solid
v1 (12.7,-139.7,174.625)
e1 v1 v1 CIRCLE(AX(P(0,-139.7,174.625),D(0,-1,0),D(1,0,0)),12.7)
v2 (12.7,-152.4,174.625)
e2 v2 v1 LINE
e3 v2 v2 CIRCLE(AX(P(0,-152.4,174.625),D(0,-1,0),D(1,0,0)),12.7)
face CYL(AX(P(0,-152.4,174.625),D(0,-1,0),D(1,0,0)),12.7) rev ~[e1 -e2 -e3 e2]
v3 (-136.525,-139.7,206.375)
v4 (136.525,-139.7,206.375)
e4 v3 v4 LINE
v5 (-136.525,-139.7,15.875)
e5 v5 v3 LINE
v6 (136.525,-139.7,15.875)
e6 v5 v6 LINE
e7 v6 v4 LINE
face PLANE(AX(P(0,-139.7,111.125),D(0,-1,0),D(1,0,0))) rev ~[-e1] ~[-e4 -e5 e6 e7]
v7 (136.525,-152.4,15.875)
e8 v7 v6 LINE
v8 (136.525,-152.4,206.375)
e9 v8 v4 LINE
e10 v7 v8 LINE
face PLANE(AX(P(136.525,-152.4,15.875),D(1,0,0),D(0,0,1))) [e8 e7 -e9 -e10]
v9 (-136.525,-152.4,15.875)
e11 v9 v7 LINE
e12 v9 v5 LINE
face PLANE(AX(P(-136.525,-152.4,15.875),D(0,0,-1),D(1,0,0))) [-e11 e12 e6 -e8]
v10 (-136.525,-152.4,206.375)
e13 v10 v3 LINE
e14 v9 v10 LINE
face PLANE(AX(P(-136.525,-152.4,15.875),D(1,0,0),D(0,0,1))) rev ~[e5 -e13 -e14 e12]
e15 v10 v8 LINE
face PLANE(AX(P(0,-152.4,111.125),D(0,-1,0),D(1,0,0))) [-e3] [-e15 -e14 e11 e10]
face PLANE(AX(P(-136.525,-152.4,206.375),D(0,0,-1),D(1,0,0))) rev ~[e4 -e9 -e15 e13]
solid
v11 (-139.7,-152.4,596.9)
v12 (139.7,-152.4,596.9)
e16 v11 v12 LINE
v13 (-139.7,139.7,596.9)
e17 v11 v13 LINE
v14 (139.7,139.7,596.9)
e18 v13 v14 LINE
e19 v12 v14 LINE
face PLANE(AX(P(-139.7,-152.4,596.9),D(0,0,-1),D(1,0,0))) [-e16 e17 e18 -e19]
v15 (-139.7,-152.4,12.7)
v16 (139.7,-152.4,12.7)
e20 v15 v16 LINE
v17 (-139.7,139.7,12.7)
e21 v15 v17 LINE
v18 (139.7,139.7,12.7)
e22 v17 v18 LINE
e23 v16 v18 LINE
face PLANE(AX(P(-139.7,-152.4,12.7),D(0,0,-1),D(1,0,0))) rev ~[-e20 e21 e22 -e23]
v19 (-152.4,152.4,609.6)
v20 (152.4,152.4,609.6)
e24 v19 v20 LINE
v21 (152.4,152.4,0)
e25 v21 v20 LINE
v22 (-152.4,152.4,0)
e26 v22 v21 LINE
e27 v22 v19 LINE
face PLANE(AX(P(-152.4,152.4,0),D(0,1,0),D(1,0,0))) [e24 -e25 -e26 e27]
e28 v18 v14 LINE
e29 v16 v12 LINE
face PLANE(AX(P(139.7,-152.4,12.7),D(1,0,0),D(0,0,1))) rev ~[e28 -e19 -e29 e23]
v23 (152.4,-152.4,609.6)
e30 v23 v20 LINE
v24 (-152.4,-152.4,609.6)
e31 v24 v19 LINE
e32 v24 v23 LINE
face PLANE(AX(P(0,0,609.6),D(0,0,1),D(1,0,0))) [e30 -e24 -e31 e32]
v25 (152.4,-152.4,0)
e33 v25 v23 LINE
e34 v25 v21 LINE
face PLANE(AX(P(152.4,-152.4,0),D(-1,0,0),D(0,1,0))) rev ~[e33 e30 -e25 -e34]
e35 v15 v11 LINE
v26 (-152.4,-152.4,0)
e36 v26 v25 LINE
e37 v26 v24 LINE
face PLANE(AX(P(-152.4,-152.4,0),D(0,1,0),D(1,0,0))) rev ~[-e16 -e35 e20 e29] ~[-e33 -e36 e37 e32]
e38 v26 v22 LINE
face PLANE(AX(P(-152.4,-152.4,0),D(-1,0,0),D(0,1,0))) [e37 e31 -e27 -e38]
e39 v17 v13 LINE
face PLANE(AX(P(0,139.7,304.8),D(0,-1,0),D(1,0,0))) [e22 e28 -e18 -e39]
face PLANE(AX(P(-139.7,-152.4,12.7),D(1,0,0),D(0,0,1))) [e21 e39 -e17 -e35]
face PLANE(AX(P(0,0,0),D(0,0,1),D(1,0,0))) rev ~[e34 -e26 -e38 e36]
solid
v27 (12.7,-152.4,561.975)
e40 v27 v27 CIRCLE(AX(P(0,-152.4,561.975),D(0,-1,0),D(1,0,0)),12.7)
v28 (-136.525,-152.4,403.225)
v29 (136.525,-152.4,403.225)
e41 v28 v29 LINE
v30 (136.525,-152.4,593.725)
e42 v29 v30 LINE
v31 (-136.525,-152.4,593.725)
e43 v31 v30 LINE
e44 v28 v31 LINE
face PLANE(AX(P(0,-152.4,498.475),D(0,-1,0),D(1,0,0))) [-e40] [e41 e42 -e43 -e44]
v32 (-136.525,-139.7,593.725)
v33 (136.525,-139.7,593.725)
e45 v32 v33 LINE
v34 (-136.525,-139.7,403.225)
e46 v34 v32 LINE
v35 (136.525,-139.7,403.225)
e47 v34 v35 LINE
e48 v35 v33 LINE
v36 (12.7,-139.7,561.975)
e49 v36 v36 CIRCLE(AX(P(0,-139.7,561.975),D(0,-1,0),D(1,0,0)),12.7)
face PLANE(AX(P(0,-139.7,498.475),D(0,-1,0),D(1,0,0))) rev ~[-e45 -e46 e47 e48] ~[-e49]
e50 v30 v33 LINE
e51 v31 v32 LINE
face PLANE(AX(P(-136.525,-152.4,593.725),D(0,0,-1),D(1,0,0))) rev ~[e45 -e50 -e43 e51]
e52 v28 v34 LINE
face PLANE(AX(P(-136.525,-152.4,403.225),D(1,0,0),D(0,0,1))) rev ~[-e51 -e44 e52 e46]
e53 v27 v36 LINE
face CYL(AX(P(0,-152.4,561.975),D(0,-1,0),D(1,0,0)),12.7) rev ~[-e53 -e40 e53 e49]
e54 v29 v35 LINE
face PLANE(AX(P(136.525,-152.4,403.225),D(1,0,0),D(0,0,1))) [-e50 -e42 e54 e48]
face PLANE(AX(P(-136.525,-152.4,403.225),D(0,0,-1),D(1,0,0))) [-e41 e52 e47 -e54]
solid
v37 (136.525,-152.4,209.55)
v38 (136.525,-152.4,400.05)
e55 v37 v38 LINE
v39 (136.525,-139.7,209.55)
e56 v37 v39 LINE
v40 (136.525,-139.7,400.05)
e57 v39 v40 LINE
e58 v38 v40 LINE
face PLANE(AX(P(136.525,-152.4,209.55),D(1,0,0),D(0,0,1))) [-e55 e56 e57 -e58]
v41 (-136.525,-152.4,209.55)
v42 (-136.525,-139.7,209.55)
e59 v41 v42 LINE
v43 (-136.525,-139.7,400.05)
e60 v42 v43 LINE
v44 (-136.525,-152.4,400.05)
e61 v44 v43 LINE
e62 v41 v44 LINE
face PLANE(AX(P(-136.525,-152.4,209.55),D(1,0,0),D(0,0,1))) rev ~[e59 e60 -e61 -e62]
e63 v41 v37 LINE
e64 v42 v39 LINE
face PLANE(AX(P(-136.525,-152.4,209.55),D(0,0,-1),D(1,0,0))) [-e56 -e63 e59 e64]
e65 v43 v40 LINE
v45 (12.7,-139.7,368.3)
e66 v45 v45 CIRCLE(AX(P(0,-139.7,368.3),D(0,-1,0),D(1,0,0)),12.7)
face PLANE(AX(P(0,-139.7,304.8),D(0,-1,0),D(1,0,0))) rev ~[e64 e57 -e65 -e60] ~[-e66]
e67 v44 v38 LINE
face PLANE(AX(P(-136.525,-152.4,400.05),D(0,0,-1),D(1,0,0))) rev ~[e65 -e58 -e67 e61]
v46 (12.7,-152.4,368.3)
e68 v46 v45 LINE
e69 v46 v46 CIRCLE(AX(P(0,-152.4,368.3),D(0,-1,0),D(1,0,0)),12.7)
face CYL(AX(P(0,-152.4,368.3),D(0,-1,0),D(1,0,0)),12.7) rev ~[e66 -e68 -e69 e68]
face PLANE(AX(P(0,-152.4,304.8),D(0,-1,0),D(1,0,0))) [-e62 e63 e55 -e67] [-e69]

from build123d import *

# Parameters (mm, degrees)
F3_W     = 304.8
F3_H     = 304.8
F4_DEPTH = 609.6
F5_W     = 279.4
F5_H     = 584.2
F6_DEPTH = 292.1
F8_W     = 273.05
F8_H     = 190.5
F8_R     = 12.7
F9_DEPTH = 12.7


# Not quite as in the source:
# - a length typed as a fraction of an inch, garbled in the dataset ("3 / 203.2 mm" for 3/8 in), is restored
# - a feature names something its author has since deleted; it is built from what else it names


with BuildPart() as f4:
    # F3 (on Top) → F4 (new body)
    with BuildSketch(Plane.XY):
        Rectangle(F3_W, F3_H)
    extrude(amount=F4_DEPTH)

    # F5 (on face) → F6 (cut)
    with BuildSketch(Plane.XZ.offset(152.4)):
        with Locations((0, 304.8)):
            Rectangle(F5_W, F5_H)
    extrude(amount=-F6_DEPTH, mode=Mode.SUBTRACT)


with BuildPart() as f9:
    # F8 (on offset) → F9 (new body)
    with BuildSketch(Plane.XZ.offset(152.4)):
        with Locations((0, 498.475)):
            Rectangle(F8_W, F8_H)
        with Locations((0, 561.975)):
            Circle(F8_R, mode=Mode.SUBTRACT)
    extrude(amount=-F9_DEPTH)


with BuildPart() as f9b:
    # F8 (on offset) → F9, piece 2 (new body)
    with BuildSketch(Plane.XZ.offset(152.4)):
        with Locations((0, 304.8)):
            Rectangle(F8_W, F8_H)
        with Locations((0, 368.3)):
            Circle(F8_R, mode=Mode.SUBTRACT)
    extrude(amount=-F9_DEPTH)


with BuildPart() as f9c:
    # F8 (on offset) → F9, piece 3 (new body)
    with BuildSketch(Plane.XZ.offset(152.4)):
        with Locations((0, 111.125)):
            Rectangle(F8_W, F8_H)
        with Locations((0, 174.625)):
            Circle(F8_R, mode=Mode.SUBTRACT)
    extrude(amount=-F9_DEPTH)


solid = Compound([f4.part, f9.part, f9b.part, f9c.part])
